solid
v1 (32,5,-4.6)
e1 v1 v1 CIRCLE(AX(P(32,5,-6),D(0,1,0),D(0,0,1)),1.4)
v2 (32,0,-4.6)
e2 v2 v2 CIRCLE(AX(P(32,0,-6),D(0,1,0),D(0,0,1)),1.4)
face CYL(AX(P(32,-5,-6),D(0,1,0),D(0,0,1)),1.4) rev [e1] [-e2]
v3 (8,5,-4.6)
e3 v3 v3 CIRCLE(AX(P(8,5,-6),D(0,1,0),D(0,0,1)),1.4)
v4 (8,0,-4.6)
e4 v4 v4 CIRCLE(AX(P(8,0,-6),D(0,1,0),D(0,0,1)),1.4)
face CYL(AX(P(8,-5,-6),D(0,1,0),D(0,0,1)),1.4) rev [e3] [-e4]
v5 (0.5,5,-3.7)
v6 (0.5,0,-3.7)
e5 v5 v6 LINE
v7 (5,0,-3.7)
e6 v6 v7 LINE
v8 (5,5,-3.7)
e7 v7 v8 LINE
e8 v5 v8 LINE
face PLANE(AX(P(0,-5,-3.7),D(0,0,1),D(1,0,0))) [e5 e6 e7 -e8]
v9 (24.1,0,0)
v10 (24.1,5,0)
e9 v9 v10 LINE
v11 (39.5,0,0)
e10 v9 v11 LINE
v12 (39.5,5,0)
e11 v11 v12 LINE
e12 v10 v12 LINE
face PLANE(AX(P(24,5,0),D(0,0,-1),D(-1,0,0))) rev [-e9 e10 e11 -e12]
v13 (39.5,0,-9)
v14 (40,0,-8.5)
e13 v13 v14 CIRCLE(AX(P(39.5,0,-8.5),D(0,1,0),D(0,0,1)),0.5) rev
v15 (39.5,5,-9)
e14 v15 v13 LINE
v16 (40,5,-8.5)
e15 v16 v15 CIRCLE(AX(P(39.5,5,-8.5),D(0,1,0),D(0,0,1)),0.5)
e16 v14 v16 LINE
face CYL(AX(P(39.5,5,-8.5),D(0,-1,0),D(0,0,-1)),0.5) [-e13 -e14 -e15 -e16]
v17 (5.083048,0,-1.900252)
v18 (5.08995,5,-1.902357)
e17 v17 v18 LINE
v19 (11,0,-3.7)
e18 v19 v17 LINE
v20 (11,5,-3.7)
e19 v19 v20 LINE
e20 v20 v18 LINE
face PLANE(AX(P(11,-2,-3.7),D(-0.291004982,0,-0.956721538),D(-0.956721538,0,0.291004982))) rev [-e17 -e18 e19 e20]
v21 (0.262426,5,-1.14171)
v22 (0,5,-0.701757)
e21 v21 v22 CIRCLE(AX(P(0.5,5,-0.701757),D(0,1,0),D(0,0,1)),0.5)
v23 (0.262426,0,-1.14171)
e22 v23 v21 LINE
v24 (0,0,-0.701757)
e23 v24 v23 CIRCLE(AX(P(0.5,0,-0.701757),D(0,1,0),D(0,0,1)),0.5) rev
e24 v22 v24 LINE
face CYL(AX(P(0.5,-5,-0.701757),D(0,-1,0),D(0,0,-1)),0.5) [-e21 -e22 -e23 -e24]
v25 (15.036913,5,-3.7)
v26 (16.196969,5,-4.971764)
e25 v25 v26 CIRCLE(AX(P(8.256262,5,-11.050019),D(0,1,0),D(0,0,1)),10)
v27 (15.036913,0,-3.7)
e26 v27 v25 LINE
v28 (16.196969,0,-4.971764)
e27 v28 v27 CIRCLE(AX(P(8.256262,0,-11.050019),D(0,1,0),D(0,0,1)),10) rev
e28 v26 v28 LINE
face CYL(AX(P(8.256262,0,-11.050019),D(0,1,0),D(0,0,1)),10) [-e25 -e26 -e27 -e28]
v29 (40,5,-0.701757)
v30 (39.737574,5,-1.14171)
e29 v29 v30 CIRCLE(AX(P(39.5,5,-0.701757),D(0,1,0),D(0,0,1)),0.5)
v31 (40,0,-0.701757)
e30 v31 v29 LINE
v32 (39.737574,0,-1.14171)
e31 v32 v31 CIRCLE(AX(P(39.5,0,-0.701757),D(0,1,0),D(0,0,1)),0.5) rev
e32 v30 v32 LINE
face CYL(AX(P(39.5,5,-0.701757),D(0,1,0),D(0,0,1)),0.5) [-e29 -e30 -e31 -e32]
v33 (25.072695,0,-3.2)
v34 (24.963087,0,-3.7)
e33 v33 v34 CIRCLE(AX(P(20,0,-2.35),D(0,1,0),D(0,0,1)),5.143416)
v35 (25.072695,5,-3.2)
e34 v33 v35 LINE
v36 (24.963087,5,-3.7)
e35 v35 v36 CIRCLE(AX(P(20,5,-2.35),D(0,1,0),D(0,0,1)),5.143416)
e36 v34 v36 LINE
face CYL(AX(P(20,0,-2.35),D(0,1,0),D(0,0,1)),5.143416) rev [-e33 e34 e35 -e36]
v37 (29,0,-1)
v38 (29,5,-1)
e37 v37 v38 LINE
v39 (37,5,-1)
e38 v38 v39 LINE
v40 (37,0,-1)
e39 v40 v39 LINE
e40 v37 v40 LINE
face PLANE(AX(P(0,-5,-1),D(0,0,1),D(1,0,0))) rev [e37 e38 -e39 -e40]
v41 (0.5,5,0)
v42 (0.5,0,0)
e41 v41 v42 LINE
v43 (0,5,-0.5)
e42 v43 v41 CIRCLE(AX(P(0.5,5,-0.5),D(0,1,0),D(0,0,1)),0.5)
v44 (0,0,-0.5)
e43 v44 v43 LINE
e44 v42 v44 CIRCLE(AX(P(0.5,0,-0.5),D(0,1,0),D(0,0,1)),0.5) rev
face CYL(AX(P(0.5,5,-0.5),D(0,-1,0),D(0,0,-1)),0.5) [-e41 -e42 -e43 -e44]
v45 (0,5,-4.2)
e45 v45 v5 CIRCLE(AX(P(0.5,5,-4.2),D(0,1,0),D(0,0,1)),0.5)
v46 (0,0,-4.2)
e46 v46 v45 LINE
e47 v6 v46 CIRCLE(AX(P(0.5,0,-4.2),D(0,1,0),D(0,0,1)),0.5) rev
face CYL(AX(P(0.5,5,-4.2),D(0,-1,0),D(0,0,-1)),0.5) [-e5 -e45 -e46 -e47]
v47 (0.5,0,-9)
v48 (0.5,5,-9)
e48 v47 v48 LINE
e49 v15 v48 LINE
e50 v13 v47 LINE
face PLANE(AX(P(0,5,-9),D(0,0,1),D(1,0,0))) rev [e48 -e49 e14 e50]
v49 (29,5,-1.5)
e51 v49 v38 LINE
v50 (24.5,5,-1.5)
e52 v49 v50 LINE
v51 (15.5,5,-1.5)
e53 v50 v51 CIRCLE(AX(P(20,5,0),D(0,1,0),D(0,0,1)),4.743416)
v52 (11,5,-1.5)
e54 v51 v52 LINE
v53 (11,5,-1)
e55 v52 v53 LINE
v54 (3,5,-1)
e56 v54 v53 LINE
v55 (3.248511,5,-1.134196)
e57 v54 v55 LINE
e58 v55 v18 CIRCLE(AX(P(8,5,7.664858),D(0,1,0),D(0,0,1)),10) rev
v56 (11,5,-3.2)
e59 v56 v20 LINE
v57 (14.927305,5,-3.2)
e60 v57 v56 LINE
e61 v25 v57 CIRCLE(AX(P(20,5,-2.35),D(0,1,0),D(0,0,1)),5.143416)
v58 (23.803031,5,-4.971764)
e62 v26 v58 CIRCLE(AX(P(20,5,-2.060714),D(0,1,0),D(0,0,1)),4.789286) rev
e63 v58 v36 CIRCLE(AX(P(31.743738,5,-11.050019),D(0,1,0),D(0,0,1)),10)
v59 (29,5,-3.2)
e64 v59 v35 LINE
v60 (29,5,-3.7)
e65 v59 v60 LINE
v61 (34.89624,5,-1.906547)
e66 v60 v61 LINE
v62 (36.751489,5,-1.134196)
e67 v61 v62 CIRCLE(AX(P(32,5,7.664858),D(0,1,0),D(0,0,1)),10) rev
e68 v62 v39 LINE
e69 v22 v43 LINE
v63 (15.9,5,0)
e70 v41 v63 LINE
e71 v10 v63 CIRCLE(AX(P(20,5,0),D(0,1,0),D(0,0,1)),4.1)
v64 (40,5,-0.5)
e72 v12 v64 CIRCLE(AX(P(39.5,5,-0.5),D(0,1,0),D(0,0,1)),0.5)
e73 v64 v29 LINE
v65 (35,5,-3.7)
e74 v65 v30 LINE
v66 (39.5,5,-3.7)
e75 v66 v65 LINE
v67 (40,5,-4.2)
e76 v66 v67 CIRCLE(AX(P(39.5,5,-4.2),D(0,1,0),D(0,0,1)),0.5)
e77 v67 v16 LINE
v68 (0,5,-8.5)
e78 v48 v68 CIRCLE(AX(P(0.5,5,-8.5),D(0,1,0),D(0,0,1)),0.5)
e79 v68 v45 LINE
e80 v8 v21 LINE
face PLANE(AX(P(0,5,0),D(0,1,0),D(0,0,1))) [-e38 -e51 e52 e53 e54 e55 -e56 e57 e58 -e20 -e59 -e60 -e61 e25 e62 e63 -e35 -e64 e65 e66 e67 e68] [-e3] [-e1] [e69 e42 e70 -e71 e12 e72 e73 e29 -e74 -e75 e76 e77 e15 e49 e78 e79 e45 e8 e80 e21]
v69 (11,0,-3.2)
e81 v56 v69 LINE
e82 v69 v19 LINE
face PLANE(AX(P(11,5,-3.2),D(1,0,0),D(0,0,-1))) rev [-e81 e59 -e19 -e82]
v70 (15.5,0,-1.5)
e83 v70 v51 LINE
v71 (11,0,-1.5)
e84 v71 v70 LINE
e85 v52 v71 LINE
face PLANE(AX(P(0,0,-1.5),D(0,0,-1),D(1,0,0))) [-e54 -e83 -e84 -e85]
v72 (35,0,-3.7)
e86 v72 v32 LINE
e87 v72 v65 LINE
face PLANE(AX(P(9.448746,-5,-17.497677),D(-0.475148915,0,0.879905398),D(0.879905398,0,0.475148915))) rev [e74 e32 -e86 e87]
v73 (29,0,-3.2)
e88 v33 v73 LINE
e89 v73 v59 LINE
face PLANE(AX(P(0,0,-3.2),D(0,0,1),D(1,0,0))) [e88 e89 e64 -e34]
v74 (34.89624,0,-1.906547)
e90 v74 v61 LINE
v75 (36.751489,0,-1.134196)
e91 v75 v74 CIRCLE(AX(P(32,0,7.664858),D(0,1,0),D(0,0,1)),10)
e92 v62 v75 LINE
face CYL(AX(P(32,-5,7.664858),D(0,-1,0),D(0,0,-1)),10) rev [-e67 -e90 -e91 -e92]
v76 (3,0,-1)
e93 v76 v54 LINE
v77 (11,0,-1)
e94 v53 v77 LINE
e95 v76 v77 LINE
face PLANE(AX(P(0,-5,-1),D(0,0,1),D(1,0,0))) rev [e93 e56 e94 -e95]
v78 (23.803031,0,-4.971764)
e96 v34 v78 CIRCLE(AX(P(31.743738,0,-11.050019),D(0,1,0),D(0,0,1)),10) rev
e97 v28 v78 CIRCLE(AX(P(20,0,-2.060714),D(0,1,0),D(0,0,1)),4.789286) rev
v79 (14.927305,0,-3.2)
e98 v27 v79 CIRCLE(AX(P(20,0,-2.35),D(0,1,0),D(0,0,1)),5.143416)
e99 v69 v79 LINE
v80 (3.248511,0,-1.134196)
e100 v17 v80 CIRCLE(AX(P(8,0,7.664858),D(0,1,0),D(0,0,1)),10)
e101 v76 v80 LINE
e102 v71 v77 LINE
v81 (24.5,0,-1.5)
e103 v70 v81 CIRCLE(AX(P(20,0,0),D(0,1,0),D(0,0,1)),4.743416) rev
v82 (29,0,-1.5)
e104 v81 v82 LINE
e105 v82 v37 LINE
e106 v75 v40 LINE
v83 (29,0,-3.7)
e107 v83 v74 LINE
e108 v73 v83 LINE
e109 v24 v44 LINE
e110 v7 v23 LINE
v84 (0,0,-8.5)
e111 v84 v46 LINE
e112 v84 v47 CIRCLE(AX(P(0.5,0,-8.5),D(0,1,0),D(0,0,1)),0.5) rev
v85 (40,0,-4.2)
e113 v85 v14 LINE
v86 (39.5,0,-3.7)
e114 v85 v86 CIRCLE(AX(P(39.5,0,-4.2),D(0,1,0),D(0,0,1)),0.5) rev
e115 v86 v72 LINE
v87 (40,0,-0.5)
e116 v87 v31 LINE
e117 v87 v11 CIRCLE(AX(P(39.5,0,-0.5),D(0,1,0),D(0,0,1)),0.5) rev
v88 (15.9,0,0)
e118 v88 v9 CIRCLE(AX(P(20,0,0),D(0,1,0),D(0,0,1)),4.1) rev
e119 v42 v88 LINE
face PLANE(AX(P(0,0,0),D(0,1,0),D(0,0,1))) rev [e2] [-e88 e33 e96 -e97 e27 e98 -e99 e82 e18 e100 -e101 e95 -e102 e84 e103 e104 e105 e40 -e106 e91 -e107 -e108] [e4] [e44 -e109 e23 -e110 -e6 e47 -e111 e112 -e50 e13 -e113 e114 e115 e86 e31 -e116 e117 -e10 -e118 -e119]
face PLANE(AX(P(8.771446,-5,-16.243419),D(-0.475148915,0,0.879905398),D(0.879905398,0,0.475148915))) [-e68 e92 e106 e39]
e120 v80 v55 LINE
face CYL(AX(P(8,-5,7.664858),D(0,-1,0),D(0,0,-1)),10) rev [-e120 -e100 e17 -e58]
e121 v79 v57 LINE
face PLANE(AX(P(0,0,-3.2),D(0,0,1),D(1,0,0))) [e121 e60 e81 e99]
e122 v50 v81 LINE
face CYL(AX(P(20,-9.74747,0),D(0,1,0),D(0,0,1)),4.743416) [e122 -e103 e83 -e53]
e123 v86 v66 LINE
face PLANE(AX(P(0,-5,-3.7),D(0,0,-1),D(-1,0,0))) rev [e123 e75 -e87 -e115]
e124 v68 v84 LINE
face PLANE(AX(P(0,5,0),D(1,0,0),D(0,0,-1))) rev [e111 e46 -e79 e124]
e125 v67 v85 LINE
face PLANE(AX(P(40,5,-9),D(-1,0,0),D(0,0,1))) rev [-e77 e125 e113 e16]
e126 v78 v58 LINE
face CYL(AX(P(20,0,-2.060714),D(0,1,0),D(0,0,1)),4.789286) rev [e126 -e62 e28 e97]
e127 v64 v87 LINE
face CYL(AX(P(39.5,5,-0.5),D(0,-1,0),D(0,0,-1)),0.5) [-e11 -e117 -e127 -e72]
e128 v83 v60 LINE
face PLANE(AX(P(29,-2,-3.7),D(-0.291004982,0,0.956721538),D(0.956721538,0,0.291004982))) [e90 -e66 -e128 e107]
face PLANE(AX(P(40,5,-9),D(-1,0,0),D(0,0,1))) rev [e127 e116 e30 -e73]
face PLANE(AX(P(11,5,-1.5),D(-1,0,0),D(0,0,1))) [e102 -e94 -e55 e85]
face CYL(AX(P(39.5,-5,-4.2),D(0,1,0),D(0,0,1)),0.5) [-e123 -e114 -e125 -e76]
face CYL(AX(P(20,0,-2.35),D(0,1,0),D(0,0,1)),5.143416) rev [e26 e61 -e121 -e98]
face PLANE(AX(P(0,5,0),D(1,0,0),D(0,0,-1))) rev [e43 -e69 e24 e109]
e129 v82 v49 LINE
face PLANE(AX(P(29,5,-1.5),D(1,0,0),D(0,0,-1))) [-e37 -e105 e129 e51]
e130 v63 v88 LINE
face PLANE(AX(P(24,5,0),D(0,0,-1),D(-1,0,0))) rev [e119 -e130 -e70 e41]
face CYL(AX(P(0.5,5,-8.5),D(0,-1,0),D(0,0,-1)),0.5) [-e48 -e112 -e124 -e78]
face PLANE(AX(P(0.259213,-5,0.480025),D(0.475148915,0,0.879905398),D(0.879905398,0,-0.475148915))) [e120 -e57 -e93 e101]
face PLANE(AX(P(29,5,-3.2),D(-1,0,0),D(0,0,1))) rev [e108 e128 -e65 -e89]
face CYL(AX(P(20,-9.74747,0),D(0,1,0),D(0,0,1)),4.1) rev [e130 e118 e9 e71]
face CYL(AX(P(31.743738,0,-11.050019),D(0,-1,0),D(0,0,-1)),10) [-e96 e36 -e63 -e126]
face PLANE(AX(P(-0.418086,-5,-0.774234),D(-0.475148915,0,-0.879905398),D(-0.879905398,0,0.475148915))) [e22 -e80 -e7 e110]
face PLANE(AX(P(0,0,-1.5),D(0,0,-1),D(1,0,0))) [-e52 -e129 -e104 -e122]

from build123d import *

# Parameters (mm, degrees)
BOSS_EXTRUDE1_DEPTH     = 5
CUT_EXTRUDE1_DEPTH      = 5
CUT_EXTRUDE1_DEPTH_BACK = 10
SKETCH2_R               = 1.4
FILLET1_R               = 10
FILLET2_R               = 0.5
CUT_EXTRUDE3_DEPTH      = 7
SKETCH6_W               = 4.5
SKETCH6_H               = 5
BOSS_EXTRUDE2_DEPTH     = 0.5
SKETCH7_W               = 9
SKETCH7_H               = 1
BOSS_EXTRUDE3_DEPTH     = 5
BOSS_EXTRUDE4_DEPTH     = 5
CUT_EXTRUDE5_START      = 5
SKETCH11_R              = 4.1
CUT_EXTRUDE5_DEPTH      = 5
CUT_EXTRUDE7_DEPTH      = 5
FILLET3_R               = 10


with BuildPart() as part:
    # Sketch1 → Boss-Extrude1 (new body)
    with BuildSketch(Plane(origin=(0, 0, 0), x_dir=(1, 0, 0), z_dir=(0, 1, 0))):
        Polygon((0, 0), (0, 9), (40, 9), (40, 0), (24, 0), (24, 5), (16, 5), (16, 0), align=None)
    extrude(amount=BOSS_EXTRUDE1_DEPTH)

    # Sketch2 → Cut-Extrude1 (cut, two sides: drawn at the far end of the back side and taken through both)
    with BuildSketch(Plane(origin=(0, 5, 0), x_dir=(1, 0, 0), z_dir=(0, 1, 0)).offset(-CUT_EXTRUDE1_DEPTH_BACK)):
        with Locations(Location((8, 6, 0), (0, 0, 270))):
            Circle(SKETCH2_R)
        with Locations(Location((32, 6, 0), (0, 0, 270))):
            Circle(SKETCH2_R)
        Polygon((5, 3.7), (0, 3.7), (0, 1), align=None)
        Polygon((13, 1), (8, 3.7), (3, 1), align=None)
        Polygon((16, 3.7), (11, 3.7), (16, 1), align=None)
        Polygon((24, 3.7), (24, 1), (29, 3.7), align=None)
        Polygon((32, 3.7), (27, 1), (37, 1), align=None)
        Polygon((40, 3.7), (35, 3.7), (40, 1), align=None)
    extrude(amount=CUT_EXTRUDE1_DEPTH + CUT_EXTRUDE1_DEPTH_BACK, mode=Mode.SUBTRACT)

    # Fillet1
    fillet1_edges = [part.edges().sort_by_distance(p)[0] for p in [
        (32, 2.5, -3.7),
        (8, 2.5, -3.7),
    ]]
    fillet(fillet1_edges, radius=FILLET1_R)

    # Fillet2
    fillet2_edges = [part.edges().sort_by_distance(p)[0] for p in [
        (0, 2.5, 0),
        (0, 2.5, -9),
        (40, 2.5, -9),
        (40, 2.5, 0),
        (24, 2.5, 0),
        (24, 2.5, -5),
        (16, 2.5, -5),
        (16, 2.5, 0),
        (0, 2.5, -1),
        (0, 2.5, -3.7),
        (16, 2.5, -3.7),
        (16, 2.5, -1),
        (24, 2.5, -3.7),
        (24, 2.5, -1),
        (40, 2.5, -3.7),
        (40, 2.5, -1),
    ]]
    fillet(fillet2_edges, radius=FILLET2_R)

    # Sketch4 → Cut-Extrude3 (cut)
    with BuildSketch(Plane(origin=(0, 5, 0), x_dir=(1, 0, 0), z_dir=(0, 1, 0))):
        Polygon((10.483197095, 1), (8, 2.335141884), (5.076146091, 1.898147599), (11, 3.7), (16.021662669, 1), align=None)
        Polygon((29.516802905, 1), (32, 2.335141884), (34.923853909, 1.898147599), (29, 3.7), (23.978337331, 1), align=None)
    extrude(amount=-CUT_EXTRUDE3_DEPTH, mode=Mode.SUBTRACT)

    # Sketch6 → Boss-Extrude2 (add)
    with BuildSketch(Plane.XY.offset(-3.7)):
        with Locations((13.25, 2.5)):
            Rectangle(SKETCH6_W, SKETCH6_H)
        with Locations((26.75, 2.5)):
            Rectangle(SKETCH6_W, SKETCH6_H)
    boss_extrude2 = extrude(amount=BOSS_EXTRUDE2_DEPTH)

    # Mirror1: Boss-Extrude2 across plane
    add(boss_extrude2.mirror(Plane.XY.offset(-2.35)))

    # Sketch7 → Boss-Extrude3 (add)
    with BuildSketch(Plane(origin=(0, 5, 0), x_dir=(1, 0, 0), z_dir=(0, 1, 0))):
        with Locations((20, 0.5)):
            Rectangle(SKETCH7_W, SKETCH7_H)
    extrude(amount=-BOSS_EXTRUDE3_DEPTH)

    # Sketch9 → Boss-Extrude4 (add)
    with BuildSketch(Plane(origin=(0, 5, 0), x_dir=(1, 0, 0), z_dir=(0, 1, 0))):
        with BuildLine():
            ThreePointArc((16.02382093, 1), (20, 4.1), (23.97617907, 1))
            Line((23.97617907, 1), (24.5, 1))
            Line((24.5, 1), (24.5, 1.5))
            ThreePointArc((24.5, 1.5), (20, 4.74341649), (15.5, 1.5))
            Line((15.5, 1.5), (15.5, 1))
            Line((15.5, 1), (16.02382093, 1))
        make_face()
    extrude(amount=-BOSS_EXTRUDE4_DEPTH)

    # Sketch11 → Cut-Extrude5 (cut)
    with BuildSketch(Plane(origin=(0, 0, 0), x_dir=(1, 0, 0), z_dir=(0, 1, 0)).offset(CUT_EXTRUDE5_START)):
        with Locations((20, 0)):
            Circle(SKETCH11_R)
    extrude(amount=-CUT_EXTRUDE5_DEPTH, mode=Mode.SUBTRACT)

    # Sketch10 → Cut-Extrude7 (cut)
    with BuildSketch(Plane(origin=(0, 5, 0), x_dir=(1, 0, 0), z_dir=(0, 1, 0))):
        with BuildLine():
            ThreePointArc((15.5, 3.7), (20, 6.85), (24.5, 3.7))
            ThreePointArc((24.5, 3.7), (24.146446609, 3.846446609), (24, 4.2))
            Line((24, 4.2), (24, 4.5))
            ThreePointArc((24, 4.5), (23.853553391, 4.853553391), (23.5, 5))
            Line((23.5, 5), (16.5, 5))
            ThreePointArc((16.5, 5), (16.146446609, 4.853553391), (16, 4.5))
            Line((16, 4.5), (16, 4.2))
            ThreePointArc((16, 4.2), (15.853553391, 3.846446609), (15.5, 3.7))
        make_face()
        with BuildLine():
            Line((24.963087063, 3.7), (24.5, 3.7))
            Line((24.5, 3.7), (24.5, 3.2))
            Line((24.5, 3.2), (25.072694865, 3.2))
            ThreePointArc((25.072694865, 3.2), (25.02411482, 3.451364366), (24.963087063, 3.7))
        make_face()
        with BuildLine():
            Line((15.5, 3.2), (15.5, 3.7))
            Line((15.5, 3.7), (15.036912937, 3.7))
            ThreePointArc((15.036912937, 3.7), (14.97588518, 3.451364366), (14.927305135, 3.2))
            Line((14.927305135, 3.2), (15.5, 3.2))
        make_face()
        with BuildLine():
            Line((15.5, 3.7), (16.031107798, 3.7))
            Line((16.031107798, 3.7), (16.5, 5))
            ThreePointArc((16.5, 5), (16.146446609, 4.853553391), (16, 4.5))
            Line((16, 4.5), (16, 4.2))
            ThreePointArc((16, 4.2), (15.853553391, 3.846446609), (15.5, 3.7))
        make_face()
        with BuildLine():
            Line((24.195310158, 3.7), (24.5, 3.7))
            ThreePointArc((24.5, 3.7), (24.146446609, 3.846446609), (24, 4.2))
            Line((24, 4.2), (24, 4.5))
            ThreePointArc((24, 4.5), (23.853553391, 4.853553391), (23.5, 5))
            Line((23.5, 5), (23.319457032, 5))
            Line((23.319457032, 5), (24.195310158, 3.7))
        make_face()
    extrude(amount=-CUT_EXTRUDE7_DEPTH, mode=Mode.SUBTRACT)

    # Fillet3
    # the kernel refuses this fillet: 10 mm, written as the material it takes off along each edge
    with BuildSketch(Plane(origin=(15.5, 8.6255598, -3.7), x_dir=(-1, 0, 0), z_dir=(0, -1, 0))) as fillet3_piece_1:
        with BuildLine():
            CenterArc((7.243737761, 7.350018783), FILLET3_R, 217.432435618, 9.874939203)
            Line((-0.696968767, 1.271764112), (-0.855782897, 1.150199019))
            ThreePointArc((-0.855782897, 1.150199019), (-0.475456762, 0.566296996), (-0.187919463, -0.068456376))
            Line((-0.187919463, -0.068456376), (0, -0.2))
            ThreePointArc((0, -0.2), (0.231543531, -0.2), (0.327474049, -0.147000376))
            Line((0.327474049, -0.147000376), (0.463087063, 0))
        make_face()
    extrude(amount=12.251119601, mode=Mode.SUBTRACT)
    with BuildSketch(Plane(origin=(24.5, 8.6255598, -3.7), x_dir=(-0.4805938979656583, 0, -0.8769432736717777), z_dir=(0, -1, 0))) as fillet3_piece_2:
        with BuildLine():
            CenterArc((2.964253367, 9.884721283), FILLET3_R, 251.41682279, 9.874939203)
            Line((-0.222556817, 0.406101085), (-0.28629302, 0.216528681))
            ThreePointArc((-0.28629302, 0.216528681), (-0.286667063, 0.106931763), (-0.175388655, -0.09611878))
            Line((-0.175388655, -0.09611878), (0.030280589, -0.197694426))
            ThreePointArc((0.030280589, -0.197694426), (0.72511196, -0.144789729), (1.419943331, -0.197694426))
            Line((1.419943331, -0.197694426), (1.45022392, 0))
        make_face()
    extrude(amount=12.251119601, mode=Mode.SUBTRACT)


solid = part.part
